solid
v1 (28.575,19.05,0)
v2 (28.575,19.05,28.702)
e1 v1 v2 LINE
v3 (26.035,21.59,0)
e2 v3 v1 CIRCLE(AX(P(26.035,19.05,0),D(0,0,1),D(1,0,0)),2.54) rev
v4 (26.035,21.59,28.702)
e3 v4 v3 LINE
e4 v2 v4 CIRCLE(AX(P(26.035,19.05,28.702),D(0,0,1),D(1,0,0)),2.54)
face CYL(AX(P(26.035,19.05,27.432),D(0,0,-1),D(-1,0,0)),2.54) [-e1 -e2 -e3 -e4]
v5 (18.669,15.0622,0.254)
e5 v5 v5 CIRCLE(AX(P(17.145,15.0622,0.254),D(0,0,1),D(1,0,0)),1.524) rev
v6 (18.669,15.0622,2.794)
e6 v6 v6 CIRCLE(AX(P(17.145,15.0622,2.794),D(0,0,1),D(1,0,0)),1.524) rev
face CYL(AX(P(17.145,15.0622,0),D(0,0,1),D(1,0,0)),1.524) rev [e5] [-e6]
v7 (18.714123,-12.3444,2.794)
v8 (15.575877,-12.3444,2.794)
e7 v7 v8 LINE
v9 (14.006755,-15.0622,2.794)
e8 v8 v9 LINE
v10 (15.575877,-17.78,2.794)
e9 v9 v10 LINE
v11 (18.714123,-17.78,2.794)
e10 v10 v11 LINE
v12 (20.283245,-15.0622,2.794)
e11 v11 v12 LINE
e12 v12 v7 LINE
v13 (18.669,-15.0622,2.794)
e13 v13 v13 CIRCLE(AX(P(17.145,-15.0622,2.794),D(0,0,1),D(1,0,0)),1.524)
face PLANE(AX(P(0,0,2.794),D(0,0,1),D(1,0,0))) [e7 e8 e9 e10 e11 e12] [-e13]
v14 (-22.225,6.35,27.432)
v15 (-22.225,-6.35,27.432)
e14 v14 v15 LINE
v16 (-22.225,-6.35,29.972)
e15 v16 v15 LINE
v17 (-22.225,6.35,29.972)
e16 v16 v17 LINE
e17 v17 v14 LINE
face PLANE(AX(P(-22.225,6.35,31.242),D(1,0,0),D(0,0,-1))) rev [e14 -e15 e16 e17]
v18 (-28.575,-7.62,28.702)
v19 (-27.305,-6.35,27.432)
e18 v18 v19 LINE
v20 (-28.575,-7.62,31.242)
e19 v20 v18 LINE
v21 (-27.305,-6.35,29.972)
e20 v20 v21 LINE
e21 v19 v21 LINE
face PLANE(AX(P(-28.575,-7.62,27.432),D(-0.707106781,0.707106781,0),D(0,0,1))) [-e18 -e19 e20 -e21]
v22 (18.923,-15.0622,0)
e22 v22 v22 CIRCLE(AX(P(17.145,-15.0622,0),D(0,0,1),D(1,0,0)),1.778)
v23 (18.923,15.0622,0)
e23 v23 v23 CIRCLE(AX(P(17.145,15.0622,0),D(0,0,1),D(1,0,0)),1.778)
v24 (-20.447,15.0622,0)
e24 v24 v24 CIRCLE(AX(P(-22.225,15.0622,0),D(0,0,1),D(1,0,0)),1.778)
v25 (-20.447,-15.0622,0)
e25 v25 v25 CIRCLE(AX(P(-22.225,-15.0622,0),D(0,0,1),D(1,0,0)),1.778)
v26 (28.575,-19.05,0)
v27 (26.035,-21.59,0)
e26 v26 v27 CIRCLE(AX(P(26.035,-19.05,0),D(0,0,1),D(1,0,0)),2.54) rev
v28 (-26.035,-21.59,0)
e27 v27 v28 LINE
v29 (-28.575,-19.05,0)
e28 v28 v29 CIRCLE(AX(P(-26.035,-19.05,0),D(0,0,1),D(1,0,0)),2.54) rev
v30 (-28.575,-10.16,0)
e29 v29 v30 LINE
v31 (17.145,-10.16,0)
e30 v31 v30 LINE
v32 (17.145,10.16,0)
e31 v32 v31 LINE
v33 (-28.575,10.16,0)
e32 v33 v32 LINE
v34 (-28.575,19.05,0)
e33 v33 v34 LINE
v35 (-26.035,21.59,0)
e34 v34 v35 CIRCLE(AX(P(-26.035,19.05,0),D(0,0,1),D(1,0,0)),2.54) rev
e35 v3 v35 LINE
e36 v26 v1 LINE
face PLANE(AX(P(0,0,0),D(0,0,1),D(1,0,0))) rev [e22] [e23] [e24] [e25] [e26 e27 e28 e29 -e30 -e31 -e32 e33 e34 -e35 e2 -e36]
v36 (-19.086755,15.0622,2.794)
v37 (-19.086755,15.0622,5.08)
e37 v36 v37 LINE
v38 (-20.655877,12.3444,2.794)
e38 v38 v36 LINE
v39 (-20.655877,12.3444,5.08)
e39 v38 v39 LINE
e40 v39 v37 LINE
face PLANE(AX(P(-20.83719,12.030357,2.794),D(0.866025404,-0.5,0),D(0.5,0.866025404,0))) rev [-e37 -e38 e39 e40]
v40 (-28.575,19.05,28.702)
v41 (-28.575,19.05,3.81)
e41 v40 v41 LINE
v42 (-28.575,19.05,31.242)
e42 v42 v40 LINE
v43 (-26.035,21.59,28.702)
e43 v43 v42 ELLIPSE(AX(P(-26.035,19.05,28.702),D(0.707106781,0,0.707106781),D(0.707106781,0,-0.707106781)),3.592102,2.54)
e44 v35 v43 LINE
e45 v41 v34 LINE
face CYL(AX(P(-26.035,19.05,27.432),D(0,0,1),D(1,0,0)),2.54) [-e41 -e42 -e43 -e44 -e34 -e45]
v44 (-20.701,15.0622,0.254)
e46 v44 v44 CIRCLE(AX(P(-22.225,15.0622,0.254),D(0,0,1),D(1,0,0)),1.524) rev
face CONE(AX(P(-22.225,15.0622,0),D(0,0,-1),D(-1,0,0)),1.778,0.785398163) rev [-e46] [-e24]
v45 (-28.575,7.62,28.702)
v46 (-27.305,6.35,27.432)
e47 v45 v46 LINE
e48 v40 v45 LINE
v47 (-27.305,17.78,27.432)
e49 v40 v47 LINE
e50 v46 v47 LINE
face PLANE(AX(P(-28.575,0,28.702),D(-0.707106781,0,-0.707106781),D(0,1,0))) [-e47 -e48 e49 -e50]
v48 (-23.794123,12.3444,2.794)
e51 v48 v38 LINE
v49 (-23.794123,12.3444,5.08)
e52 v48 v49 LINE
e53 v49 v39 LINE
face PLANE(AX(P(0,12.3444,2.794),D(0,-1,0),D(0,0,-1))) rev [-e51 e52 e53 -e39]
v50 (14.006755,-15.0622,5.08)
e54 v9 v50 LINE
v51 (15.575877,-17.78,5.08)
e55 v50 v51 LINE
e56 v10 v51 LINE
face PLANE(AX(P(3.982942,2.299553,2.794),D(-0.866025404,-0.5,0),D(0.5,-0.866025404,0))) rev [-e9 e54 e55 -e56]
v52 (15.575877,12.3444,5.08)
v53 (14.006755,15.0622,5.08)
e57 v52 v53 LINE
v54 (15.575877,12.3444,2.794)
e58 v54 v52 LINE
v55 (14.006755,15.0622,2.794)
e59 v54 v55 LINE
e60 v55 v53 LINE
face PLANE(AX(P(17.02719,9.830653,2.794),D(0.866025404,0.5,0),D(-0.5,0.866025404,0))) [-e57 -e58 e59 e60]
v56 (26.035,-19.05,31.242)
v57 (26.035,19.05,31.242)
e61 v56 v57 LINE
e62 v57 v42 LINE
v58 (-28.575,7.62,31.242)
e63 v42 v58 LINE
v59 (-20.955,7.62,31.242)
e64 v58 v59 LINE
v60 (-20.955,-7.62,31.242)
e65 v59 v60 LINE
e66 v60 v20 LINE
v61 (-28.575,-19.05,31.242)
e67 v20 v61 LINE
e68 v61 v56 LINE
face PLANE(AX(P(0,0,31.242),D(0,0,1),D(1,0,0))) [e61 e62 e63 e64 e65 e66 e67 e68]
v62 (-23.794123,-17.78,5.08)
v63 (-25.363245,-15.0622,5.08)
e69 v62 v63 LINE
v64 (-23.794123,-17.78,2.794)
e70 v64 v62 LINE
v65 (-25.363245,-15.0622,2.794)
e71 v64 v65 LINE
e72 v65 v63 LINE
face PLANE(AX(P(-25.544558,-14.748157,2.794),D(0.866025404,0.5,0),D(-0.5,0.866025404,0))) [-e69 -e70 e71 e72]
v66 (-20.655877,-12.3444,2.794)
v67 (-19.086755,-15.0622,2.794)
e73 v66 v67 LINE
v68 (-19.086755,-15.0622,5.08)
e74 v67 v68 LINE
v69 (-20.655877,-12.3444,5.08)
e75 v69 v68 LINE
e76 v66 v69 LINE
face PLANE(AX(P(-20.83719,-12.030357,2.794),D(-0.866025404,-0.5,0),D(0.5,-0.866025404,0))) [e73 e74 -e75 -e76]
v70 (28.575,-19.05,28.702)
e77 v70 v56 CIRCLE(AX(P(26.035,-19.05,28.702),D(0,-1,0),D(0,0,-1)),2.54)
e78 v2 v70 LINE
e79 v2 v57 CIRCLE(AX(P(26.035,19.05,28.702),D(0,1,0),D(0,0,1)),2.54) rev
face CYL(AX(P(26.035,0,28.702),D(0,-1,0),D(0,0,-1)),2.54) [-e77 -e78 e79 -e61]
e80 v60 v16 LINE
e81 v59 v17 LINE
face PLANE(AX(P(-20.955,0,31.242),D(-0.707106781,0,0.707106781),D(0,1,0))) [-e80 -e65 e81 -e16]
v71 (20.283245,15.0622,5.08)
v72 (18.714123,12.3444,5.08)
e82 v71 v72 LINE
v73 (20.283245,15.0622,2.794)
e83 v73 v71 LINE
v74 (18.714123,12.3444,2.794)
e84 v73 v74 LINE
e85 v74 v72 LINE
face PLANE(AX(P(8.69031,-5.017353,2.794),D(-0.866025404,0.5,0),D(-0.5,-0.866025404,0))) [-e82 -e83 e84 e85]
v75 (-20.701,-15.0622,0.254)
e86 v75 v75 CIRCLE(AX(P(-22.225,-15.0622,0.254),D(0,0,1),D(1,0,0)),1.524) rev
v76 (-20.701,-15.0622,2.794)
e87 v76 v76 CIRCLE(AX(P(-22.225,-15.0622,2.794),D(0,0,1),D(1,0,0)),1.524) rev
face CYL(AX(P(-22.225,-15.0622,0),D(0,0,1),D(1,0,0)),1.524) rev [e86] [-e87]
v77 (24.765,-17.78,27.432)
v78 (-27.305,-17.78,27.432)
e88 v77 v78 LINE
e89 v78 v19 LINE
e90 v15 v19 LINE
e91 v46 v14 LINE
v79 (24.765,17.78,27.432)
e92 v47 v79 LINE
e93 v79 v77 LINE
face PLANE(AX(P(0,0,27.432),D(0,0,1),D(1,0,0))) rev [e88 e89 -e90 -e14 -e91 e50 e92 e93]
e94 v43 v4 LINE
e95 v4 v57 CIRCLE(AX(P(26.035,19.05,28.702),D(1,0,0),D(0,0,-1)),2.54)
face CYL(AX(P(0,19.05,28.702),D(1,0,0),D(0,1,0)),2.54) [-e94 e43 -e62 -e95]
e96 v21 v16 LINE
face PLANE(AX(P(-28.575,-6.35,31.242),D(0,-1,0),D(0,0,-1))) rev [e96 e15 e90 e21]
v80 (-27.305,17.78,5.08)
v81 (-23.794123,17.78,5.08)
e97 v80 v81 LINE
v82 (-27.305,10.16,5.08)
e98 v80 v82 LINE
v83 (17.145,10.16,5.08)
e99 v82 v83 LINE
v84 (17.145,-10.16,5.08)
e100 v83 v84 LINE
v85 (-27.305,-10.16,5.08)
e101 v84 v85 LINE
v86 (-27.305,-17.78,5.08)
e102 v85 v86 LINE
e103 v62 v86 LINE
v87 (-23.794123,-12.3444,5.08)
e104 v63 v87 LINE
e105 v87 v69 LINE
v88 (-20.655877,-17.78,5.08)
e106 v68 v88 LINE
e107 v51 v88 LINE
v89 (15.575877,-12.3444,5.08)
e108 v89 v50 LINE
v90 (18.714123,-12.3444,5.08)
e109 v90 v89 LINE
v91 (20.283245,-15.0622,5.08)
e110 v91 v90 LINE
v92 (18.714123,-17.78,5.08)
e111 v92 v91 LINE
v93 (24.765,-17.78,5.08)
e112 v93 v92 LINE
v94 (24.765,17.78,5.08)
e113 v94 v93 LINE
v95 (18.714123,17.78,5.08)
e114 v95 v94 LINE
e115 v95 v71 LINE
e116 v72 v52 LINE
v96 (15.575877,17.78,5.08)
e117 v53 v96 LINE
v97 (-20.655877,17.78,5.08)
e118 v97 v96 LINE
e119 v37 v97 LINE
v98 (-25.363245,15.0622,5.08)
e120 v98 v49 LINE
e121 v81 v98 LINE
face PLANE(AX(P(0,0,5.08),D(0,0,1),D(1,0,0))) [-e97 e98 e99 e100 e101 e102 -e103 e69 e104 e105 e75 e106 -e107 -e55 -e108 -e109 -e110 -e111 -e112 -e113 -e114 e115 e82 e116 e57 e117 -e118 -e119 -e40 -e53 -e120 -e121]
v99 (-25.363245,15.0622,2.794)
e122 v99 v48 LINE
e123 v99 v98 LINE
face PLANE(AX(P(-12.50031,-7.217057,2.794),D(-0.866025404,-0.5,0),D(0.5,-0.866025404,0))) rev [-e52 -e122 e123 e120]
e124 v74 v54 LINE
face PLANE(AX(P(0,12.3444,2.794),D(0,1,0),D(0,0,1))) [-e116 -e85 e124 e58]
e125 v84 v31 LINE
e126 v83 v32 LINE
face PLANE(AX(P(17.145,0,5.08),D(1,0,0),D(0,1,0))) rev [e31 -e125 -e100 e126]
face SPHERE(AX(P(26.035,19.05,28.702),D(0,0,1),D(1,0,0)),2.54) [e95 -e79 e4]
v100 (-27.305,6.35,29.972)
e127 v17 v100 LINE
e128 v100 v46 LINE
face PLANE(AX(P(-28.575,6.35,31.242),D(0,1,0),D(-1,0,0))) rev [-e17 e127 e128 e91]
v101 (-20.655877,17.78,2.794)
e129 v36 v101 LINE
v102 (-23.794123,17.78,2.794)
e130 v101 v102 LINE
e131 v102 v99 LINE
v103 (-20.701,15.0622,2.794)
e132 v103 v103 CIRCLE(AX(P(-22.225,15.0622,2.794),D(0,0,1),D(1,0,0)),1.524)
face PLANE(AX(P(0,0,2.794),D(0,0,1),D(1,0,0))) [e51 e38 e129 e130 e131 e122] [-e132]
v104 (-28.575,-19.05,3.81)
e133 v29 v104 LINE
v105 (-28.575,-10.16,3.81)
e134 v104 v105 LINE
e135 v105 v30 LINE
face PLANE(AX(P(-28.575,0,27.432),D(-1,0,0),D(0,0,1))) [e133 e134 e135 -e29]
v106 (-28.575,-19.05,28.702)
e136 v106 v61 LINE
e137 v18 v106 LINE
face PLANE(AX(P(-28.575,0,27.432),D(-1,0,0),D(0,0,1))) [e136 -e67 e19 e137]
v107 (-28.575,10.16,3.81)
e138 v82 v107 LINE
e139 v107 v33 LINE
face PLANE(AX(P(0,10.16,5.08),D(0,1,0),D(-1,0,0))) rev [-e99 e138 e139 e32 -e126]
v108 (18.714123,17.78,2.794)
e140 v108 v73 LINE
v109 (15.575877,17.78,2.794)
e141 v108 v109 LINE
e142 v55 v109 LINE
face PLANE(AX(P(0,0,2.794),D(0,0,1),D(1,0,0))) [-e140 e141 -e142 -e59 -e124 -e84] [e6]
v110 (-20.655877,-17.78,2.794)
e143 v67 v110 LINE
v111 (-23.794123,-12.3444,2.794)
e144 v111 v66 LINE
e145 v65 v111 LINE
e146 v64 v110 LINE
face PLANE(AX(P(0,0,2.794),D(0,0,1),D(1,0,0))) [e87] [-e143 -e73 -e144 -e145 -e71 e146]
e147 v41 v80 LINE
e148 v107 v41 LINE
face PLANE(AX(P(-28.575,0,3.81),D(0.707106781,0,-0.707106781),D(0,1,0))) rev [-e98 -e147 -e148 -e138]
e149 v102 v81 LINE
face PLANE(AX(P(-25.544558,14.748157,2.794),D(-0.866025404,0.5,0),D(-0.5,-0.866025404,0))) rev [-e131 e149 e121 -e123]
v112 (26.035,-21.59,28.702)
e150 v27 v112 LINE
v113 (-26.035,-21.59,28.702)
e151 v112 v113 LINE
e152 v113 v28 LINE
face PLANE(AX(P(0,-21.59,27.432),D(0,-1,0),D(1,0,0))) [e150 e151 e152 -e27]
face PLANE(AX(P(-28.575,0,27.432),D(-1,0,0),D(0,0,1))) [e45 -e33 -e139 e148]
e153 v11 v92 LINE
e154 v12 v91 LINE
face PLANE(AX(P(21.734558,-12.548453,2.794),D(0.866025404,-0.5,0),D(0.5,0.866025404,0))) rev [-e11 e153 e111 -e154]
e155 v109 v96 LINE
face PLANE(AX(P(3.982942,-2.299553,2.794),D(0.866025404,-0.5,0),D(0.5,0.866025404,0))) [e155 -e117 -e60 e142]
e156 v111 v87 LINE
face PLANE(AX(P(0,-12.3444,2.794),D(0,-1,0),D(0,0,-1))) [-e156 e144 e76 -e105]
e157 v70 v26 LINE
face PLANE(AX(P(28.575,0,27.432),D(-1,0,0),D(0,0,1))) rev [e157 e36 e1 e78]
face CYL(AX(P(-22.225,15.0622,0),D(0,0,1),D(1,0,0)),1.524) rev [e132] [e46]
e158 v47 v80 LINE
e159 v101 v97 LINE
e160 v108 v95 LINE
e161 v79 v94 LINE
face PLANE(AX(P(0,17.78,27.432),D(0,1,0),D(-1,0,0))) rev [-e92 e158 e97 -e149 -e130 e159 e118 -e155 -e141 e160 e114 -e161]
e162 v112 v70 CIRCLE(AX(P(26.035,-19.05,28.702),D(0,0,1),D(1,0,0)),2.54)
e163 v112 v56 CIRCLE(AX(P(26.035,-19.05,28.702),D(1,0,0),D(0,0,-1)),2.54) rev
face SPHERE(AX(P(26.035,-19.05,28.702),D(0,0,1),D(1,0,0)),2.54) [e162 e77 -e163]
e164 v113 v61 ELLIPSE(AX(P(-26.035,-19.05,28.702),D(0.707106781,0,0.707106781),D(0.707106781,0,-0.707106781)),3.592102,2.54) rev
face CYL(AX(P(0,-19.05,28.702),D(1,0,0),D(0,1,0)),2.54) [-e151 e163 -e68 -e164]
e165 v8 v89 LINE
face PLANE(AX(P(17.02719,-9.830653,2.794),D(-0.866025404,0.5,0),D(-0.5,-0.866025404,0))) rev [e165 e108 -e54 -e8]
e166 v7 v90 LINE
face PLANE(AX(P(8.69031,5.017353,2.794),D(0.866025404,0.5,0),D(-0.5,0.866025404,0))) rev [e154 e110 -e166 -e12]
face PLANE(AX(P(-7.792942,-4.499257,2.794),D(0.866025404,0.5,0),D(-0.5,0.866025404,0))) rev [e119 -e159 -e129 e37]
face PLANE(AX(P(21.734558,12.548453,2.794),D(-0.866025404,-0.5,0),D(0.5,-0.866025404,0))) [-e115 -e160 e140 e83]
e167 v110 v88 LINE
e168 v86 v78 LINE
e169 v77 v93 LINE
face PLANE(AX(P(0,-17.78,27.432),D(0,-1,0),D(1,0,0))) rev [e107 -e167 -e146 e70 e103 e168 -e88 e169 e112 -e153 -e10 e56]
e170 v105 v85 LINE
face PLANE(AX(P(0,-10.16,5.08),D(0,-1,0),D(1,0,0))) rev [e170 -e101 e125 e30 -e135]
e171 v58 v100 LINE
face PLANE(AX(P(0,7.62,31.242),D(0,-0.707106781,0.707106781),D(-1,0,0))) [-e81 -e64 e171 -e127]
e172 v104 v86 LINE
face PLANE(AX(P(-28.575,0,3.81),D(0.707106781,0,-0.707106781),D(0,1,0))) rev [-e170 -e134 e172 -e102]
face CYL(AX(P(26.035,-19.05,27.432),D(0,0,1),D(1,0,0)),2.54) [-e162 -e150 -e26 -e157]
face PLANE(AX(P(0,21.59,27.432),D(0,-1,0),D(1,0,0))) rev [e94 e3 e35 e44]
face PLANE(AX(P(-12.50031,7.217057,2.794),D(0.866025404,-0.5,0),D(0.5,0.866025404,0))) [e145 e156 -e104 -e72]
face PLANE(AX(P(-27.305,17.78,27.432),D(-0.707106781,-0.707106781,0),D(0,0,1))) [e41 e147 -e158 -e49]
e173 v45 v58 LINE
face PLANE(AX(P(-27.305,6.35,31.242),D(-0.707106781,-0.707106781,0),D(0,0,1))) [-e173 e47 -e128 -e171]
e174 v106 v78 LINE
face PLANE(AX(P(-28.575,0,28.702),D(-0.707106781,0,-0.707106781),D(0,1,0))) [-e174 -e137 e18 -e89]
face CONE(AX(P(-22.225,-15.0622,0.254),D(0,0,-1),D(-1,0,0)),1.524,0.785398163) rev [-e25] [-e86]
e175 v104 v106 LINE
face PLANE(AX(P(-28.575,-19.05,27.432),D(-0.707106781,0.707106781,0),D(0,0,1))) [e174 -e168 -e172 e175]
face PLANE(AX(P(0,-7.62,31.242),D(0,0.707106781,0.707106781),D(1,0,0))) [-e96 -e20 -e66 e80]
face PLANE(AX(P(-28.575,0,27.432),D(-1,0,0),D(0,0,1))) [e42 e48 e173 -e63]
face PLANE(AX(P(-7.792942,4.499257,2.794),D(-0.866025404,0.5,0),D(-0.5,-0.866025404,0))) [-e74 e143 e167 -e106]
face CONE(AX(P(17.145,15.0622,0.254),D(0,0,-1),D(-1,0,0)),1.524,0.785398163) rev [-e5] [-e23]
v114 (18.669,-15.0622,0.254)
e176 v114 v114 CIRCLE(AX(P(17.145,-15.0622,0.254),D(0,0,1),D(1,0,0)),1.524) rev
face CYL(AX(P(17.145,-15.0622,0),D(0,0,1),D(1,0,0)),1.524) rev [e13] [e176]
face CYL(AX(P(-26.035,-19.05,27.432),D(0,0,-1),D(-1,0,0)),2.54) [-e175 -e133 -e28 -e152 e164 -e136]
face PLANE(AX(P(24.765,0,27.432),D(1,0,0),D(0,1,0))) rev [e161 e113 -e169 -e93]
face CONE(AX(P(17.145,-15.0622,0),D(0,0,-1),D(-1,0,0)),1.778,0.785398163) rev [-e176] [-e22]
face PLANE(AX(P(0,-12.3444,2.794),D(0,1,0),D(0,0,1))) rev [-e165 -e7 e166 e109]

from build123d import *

# Parameters (mm, degrees)
BOSS_EXTRUDE1_DEPTH = 27.432
BOSS_EXTRUDE2_DEPTH = 5.08
SKETCH4_R           = 1.524
CUT_EXTRUDE1_DEPTH  = 2.286
SKETCH4_4_R         = 1.524
CUT_EXTRUDE2_DEPTH  = 43.216947178
BOSS_EXTRUDE3_DEPTH = 3.81
FILLET1_R           = 2.54
CHAMFER3_SIZE       = 1.27
CHAMFER4_SIZE       = 0.254


with BuildPart() as part:
    # Sketch1 → Boss-Extrude1 (new body)
    with BuildSketch(Plane.XY):
        Polygon((-28.575, 21.59), (-28.575, 17.78), (24.765, 17.78), (24.765, -17.78), (-28.575, -17.78), (-28.575, -21.59), (28.575, -21.59), (28.575, 21.59), align=None)
    extrude(amount=BOSS_EXTRUDE1_DEPTH)

    # Sketch1<3> → Boss-Extrude2 (add)
    with BuildSketch(Plane.XY):
        Polygon((24.765, 17.78), (-28.575, 17.78), (-28.575, 10.16), (17.145, 10.16), (17.145, -10.16), (-28.575, -10.16), (-28.575, -17.78), (24.765, -17.78), align=None)
    extrude(amount=BOSS_EXTRUDE2_DEPTH)

    # Sketch4 → Cut-Extrude1 (cut)
    # profile 1 of 4: a face of its own
    with BuildSketch(Plane.XY.offset(5.08)):
        Polygon((-20.655877438, 17.78), (-23.794122562, 17.78), (-25.363245123, 15.0622), (-23.794122562, 12.3444), (-20.655877438, 12.3444), (-19.086754877, 15.0622), align=None)
        with Locations((-22.225, 15.0622)):
            Circle(SKETCH4_R, mode=Mode.SUBTRACT)
    # profile 2 of 4: a face of its own
    with BuildSketch(Plane.XY.offset(5.08)):
        Polygon((18.714122562, 12.3444), (15.575877438, 12.3444), (14.006754877, 15.0622), (15.575877438, 17.78), (18.714122562, 17.78), (20.283245123, 15.0622), align=None)
        with Locations((17.145, 15.0622)):
            Circle(SKETCH4_R, mode=Mode.SUBTRACT)
    # profile 3 of 4: a face of its own
    with BuildSketch(Plane.XY.offset(5.08)):
        Polygon((20.283245123, -15.0622), (18.714122562, -12.3444), (15.575877438, -12.3444), (14.006754877, -15.0622), (15.575877438, -17.78), (18.714122562, -17.78), align=None)
        with Locations((17.145, -15.0622)):
            Circle(SKETCH4_R, mode=Mode.SUBTRACT)
    # profile 4 of 4: a face of its own
    with BuildSketch(Plane.XY.offset(5.08)):
        Polygon((-25.363245123, -15.0622), (-23.794122562, -12.3444), (-20.655877438, -12.3444), (-19.086754877, -15.0622), (-20.655877438, -17.78), (-23.794122562, -17.78), align=None)
        with Locations((-22.225, -15.0622)):
            Circle(SKETCH4_R, mode=Mode.SUBTRACT)
    extrude(amount=-CUT_EXTRUDE1_DEPTH, mode=Mode.SUBTRACT)

    # Sketch4<4> → Cut-Extrude2 (cut, through all)
    with BuildSketch(Plane.XY.offset(5.08)):
        with Locations((-22.225, 15.0622)):
            Circle(SKETCH4_4_R)
        with Locations((17.145, 15.0622)):
            Circle(SKETCH4_4_R)
        with Locations((-22.225, -15.0622)):
            Circle(SKETCH4_4_R)
        with Locations((17.145, -15.0622)):
            Circle(SKETCH4_4_R)
    extrude(amount=-CUT_EXTRUDE2_DEPTH, mode=Mode.SUBTRACT)

    # Sketch7 → Boss-Extrude3 (add)
    with BuildSketch(Plane.XY.offset(27.432)):
        Polygon((-28.575, 21.59), (28.575, 21.59), (28.575, -21.59), (-28.575, -21.59), (-28.575, -6.35), (-22.225, -6.35), (-22.225, 6.35), (-28.575, 6.35), align=None)
    extrude(amount=BOSS_EXTRUDE3_DEPTH)

    # Fillet1
    fillet1_edges = [part.edges().sort_by_distance(p)[0] for p in [
        (-28.575, 21.59, 15.621),
        (28.575, 21.59, 15.621),
        (28.575, -21.59, 15.621),
        (-28.575, -21.59, 15.621),
        (0, -21.59, 31.242),
        (28.575, 0, 31.242),
        (0, 21.59, 31.242),
    ]]
    fillet(fillet1_edges, radius=FILLET1_R)

    # Chamfer3
    chamfer3_edges = [part.edges().sort_by_distance(p)[0] for p in [
        (-28.575, 12.065, 27.432),
        (-28.575, 17.78, 16.256),
        (-28.575, 6.35, 29.337),
        (-28.575, -12.065, 27.432),
        (-28.575, -6.35, 29.337),
        (-25.4, 6.35, 31.242),
        (-22.225, 0, 31.242),
        (-25.4, -6.35, 31.242),
        (-28.575, -17.78, 16.256),
        (-28.575, -13.97, 5.08),
        (-28.575, 13.97, 5.08),
    ]]
    chamfer(chamfer3_edges, length=CHAMFER3_SIZE - 0.0001)  # a hair under: the kernel refuses the full size

    # Chamfer4
    chamfer4_edges = [part.edges().sort_by_distance(p)[0] for p in [
        (15.621, 15.0622, 0),
        (-23.749, -15.0622, 0),
        (15.621, -15.0622, 0),
        (-23.749, 15.0622, 0),
    ]]
    chamfer(chamfer4_edges, length=CHAMFER4_SIZE)


solid = part.part
